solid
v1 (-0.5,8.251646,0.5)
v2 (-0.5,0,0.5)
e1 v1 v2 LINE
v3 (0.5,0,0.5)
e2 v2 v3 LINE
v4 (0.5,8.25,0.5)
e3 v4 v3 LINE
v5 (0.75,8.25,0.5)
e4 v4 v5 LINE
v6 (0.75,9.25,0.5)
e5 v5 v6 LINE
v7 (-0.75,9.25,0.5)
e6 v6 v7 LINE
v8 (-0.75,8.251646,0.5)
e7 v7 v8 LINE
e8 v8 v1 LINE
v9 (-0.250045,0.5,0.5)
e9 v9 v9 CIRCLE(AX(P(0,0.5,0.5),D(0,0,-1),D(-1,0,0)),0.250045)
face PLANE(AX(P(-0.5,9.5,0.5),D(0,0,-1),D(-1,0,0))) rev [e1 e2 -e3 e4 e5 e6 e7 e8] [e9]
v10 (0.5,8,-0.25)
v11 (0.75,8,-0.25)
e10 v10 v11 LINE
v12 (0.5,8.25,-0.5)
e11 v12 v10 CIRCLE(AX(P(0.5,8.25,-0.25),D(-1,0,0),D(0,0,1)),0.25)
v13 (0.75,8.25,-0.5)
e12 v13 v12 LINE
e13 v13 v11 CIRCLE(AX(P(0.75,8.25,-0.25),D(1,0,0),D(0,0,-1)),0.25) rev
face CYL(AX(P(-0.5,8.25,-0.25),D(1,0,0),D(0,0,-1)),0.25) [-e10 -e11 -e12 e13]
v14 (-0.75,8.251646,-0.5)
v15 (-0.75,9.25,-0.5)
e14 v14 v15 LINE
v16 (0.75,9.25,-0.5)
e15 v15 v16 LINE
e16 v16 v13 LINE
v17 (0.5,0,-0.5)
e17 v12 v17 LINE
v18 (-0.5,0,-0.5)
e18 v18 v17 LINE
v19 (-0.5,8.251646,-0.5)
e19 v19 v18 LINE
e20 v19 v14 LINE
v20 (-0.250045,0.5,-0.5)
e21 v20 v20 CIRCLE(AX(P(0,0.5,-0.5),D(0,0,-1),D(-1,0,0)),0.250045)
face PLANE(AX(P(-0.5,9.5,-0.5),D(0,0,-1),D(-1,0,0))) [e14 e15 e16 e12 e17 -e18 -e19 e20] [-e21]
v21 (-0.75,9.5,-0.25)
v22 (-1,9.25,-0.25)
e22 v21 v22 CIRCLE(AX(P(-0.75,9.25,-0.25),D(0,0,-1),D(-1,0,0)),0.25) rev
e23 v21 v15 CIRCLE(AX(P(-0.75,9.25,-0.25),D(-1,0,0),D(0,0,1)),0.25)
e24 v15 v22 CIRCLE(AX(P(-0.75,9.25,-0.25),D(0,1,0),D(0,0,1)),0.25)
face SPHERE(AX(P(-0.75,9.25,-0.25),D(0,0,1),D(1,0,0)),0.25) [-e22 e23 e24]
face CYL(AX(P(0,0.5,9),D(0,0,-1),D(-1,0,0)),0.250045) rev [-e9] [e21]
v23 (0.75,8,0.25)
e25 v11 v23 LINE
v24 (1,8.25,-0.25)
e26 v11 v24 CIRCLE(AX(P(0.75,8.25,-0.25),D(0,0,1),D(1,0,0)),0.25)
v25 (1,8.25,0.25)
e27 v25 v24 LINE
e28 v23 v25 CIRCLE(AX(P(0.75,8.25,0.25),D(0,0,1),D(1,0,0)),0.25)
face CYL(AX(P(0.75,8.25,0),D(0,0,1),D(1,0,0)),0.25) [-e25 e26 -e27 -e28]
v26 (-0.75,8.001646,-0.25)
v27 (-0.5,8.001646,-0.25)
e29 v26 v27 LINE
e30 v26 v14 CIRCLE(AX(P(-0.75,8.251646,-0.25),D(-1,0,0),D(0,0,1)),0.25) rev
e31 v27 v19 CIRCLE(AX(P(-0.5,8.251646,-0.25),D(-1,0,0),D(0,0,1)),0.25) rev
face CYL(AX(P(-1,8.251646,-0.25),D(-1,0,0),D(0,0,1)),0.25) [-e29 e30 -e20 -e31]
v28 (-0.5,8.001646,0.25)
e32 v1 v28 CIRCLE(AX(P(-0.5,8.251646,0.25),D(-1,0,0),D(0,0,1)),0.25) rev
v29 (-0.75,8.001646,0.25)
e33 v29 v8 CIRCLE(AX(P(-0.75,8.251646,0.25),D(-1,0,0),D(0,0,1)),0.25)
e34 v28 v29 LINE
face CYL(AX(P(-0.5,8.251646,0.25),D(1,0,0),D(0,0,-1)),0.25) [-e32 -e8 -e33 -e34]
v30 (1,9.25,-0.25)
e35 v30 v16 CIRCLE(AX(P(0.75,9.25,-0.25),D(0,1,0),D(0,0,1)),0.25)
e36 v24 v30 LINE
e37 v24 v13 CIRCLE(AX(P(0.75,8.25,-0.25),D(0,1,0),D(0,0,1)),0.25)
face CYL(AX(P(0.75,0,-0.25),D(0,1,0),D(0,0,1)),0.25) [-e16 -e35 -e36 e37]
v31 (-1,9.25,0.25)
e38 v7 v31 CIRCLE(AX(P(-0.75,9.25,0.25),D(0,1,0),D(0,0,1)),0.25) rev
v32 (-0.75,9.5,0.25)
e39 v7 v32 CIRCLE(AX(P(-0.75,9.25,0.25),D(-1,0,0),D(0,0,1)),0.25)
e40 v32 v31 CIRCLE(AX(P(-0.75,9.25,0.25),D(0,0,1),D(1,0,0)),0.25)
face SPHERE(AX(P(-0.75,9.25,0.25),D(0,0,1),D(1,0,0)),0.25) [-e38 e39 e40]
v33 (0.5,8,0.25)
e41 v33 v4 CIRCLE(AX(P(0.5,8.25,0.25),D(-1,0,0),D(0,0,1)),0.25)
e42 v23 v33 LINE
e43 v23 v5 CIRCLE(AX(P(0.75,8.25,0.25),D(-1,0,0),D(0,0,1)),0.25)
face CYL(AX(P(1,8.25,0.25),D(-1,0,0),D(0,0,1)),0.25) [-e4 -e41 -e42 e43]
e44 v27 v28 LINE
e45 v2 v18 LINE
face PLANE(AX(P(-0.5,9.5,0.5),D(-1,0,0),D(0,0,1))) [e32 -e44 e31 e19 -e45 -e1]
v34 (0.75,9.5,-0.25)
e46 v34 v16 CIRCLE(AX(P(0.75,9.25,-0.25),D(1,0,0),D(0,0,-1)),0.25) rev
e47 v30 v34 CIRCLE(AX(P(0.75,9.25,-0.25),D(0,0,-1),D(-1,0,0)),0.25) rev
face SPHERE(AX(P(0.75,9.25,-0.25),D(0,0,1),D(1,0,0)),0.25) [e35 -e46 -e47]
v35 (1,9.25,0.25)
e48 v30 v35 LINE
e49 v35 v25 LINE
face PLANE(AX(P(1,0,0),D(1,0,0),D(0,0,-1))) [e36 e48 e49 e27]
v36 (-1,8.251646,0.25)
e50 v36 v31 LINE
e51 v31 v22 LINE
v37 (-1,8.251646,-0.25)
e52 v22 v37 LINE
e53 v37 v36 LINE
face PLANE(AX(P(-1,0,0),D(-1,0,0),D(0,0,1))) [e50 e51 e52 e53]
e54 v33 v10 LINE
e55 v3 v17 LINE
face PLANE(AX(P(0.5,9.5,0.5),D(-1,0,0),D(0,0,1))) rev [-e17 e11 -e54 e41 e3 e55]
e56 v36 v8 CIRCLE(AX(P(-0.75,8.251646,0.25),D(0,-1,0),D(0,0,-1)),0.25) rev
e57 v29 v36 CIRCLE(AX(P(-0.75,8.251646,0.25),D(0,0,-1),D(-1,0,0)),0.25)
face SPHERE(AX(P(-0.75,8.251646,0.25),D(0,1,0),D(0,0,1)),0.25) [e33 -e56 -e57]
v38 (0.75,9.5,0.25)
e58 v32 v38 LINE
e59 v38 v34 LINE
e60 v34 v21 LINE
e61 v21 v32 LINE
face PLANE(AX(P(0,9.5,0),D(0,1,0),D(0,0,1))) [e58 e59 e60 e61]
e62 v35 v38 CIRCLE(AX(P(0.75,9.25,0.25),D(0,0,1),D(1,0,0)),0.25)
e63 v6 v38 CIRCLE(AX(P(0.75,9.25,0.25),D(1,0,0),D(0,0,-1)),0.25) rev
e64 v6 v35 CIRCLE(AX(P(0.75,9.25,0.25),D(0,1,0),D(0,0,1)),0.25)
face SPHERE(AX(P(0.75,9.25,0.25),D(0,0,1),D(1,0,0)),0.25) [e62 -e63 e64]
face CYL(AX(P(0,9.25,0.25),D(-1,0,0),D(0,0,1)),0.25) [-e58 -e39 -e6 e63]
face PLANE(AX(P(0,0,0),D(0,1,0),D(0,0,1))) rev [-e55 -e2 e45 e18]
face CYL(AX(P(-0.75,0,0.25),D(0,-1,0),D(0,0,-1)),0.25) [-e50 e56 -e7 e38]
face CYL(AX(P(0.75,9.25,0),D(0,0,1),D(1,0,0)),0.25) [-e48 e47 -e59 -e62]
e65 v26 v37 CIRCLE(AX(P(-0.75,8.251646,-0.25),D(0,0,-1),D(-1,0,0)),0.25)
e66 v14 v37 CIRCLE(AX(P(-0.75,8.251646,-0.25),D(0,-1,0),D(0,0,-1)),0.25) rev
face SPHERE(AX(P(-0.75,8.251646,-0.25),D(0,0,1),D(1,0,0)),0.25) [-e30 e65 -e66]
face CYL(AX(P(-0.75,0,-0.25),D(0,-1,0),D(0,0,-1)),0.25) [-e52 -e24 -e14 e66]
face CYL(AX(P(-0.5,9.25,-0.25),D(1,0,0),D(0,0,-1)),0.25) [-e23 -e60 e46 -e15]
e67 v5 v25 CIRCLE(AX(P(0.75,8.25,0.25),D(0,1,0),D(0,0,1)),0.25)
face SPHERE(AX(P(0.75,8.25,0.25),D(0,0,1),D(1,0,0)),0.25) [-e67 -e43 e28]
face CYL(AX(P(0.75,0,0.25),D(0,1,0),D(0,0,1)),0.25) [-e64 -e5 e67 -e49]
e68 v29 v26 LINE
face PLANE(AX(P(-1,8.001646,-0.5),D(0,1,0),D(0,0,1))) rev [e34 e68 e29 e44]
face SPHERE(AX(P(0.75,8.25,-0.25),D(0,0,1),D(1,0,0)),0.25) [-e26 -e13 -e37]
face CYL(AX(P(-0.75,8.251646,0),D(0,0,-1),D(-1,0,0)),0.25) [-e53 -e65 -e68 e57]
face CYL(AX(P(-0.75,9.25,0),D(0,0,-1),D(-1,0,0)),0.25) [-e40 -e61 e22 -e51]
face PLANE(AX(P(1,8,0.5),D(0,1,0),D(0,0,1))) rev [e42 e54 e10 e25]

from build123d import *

# Parameters (mm, degrees)
SZKIC1_W                    = 1
SZKIC1_H                    = 1
DODANIE_WYCI_GNI_CIE2_DEPTH = 9.5
SZKIC2_R                    = 0.250044668
WYTNIJ_WYCI_GNI_CIE1_DEPTH  = 9.5
SZKIC3_W                    = 1
SZKIC3_H                    = 1.5
DODANIE_WYCI_GNI_CIE3_DEPTH = 0.5
SZKIC4_W                    = 1
SZKIC4_H                    = 1.498354428
DODANIE_WYCI_GNI_CIE4_DEPTH = 0.5
ZAOKR_GLENIE1_R             = 0.25
ZAOKR_GLENIE2_R             = 0.25


with BuildPart() as part:
    # Szkic1 → Dodanie-wyciągnięcie2 (new body)
    with BuildSketch(Plane(origin=(0, 0, 0), x_dir=(1, 0, 0), z_dir=(0, 1, 0))):
        Rectangle(SZKIC1_W, SZKIC1_H)
    extrude(amount=DODANIE_WYCI_GNI_CIE2_DEPTH)

    # Szkic2 → Wytnij-wyciągnięcie1 (cut)
    with BuildSketch(Plane(origin=(0, 0, -0.5), x_dir=(-1, 0, 0), z_dir=(0, 0, -1))):
        with Locations((0, 0.5)):
            Circle(SZKIC2_R)
    extrude(amount=-WYTNIJ_WYCI_GNI_CIE1_DEPTH, mode=Mode.SUBTRACT)

    # Szkic3 → Dodanie-wyciągnięcie3 (add)
    with BuildSketch(Plane(origin=(0.5, 0, 0), x_dir=(0, 0, -1), z_dir=(1, 0, 0))):
        with Locations((0, 8.75)):
            Rectangle(SZKIC3_W, SZKIC3_H)
    extrude(amount=DODANIE_WYCI_GNI_CIE3_DEPTH)

    # Szkic4 → Dodanie-wyciągnięcie4 (add)
    with BuildSketch(Plane.ZY.offset(0.5)):
        with Locations((0, 8.750822786)):
            Rectangle(SZKIC4_W, SZKIC4_H)
    extrude(amount=DODANIE_WYCI_GNI_CIE4_DEPTH)

    # Zaokrąglenie1
    zaokr_glenie1_edges = [part.edges().sort_by_distance(p)[0] for p in [
        (0, 9.5, -0.5),
        (0.75, 8, 0.5),
        (0.75, 8, -0.5),
        (1, 8.75, 0.5),
        (1, 8.75, -0.5),
        (1, 9.5, 0),
        (-0.75, 8.001645572, -0.5),
        (-1, 8.750822786, -0.5),
        (-1, 8.750822786, 0.5),
        (-1, 9.5, 0),
        (0, 9.5, 0.5),
    ]]
    fillet(zaokr_glenie1_edges, radius=ZAOKR_GLENIE1_R)

    # Zaokrąglenie2
    # the kernel refuses this fillet: 0.25 mm, written as the material it takes off along each edge
    with BuildSketch(Plane(origin=(0.75, 8.25, -0.25), x_dir=(0, -1, 0), z_dir=(1, 0, 0))) as zaokr_glenie2_piece_1_section:
        Polygon((0, 0), (ZAOKR_GLENIE2_R, 0), (ZAOKR_GLENIE2_R, ZAOKR_GLENIE2_R), (0, ZAOKR_GLENIE2_R), align=None)
    zaokr_glenie2_piece_1 = extrude(amount=ZAOKR_GLENIE2_R, mode=Mode.PRIVATE)
    zaokr_glenie2_piece_1 = zaokr_glenie2_piece_1 - Plane(origin=(0.75, 8.25, -0.25), x_dir=(0, 0.7071067811865475, 0.7071067811865475), z_dir=(1, 0, 0)) * Sphere(ZAOKR_GLENIE2_R, mode=Mode.PRIVATE)
    add(zaokr_glenie2_piece_1, mode=Mode.SUBTRACT)
    with BuildSketch(Plane(origin=(-0.75, 8.251645572, -0.25), x_dir=(0, -1, 0), z_dir=(-1, 0, 0))) as zaokr_glenie2_piece_2_section:
        Polygon((0, 0), (ZAOKR_GLENIE2_R, 0), (ZAOKR_GLENIE2_R, -ZAOKR_GLENIE2_R), (0, -ZAOKR_GLENIE2_R), align=None)
    zaokr_glenie2_piece_2 = extrude(amount=ZAOKR_GLENIE2_R, mode=Mode.PRIVATE)
    zaokr_glenie2_piece_2 = zaokr_glenie2_piece_2 - Plane(origin=(-0.75, 8.251645572, -0.25), x_dir=(0, 0.7071067811865475, 0.7071067811865475), z_dir=(-1, 0, 0)) * Sphere(ZAOKR_GLENIE2_R, mode=Mode.PRIVATE)
    add(zaokr_glenie2_piece_2, mode=Mode.SUBTRACT)
    with BuildSketch(Plane(origin=(0.75, 8.25, 0.25), x_dir=(0, -1, 0), z_dir=(1, 0, 0))) as zaokr_glenie2_piece_3_section:
        Polygon((0, 0), (ZAOKR_GLENIE2_R, 0), (ZAOKR_GLENIE2_R, -ZAOKR_GLENIE2_R), (0, -ZAOKR_GLENIE2_R), align=None)
    zaokr_glenie2_piece_3 = extrude(amount=ZAOKR_GLENIE2_R, mode=Mode.PRIVATE)
    zaokr_glenie2_piece_3 = zaokr_glenie2_piece_3 - Plane(origin=(0.75, 8.25, 0.25), x_dir=(0, 0.7071067811865475, -0.7071067811865475), z_dir=(1, 0, 0)) * Sphere(ZAOKR_GLENIE2_R, mode=Mode.PRIVATE)
    add(zaokr_glenie2_piece_3, mode=Mode.SUBTRACT)
    with BuildSketch(Plane(origin=(-1, 8.001645572, 0.25), x_dir=(0, 1, 0), z_dir=(0, 0, -1)), Plane(origin=(1, 8, -0.25), x_dir=(0, 1, 0), z_dir=(0, 0, 1))) as zaokr_glenie2_piece_4:
        with BuildLine():
            CenterArc((ZAOKR_GLENIE2_R, ZAOKR_GLENIE2_R), ZAOKR_GLENIE2_R, 180, 90)
            Line((0, ZAOKR_GLENIE2_R), (0, 0))
            Line((0, 0), (ZAOKR_GLENIE2_R, 0))
        make_face()
    extrude(amount=0.5, mode=Mode.SUBTRACT)
    with BuildSketch(Plane(origin=(-0.5, 8.001645572, 0.5), x_dir=(0, 1, 0), z_dir=(-1, 0, 0))) as zaokr_glenie2_piece_5:
        with BuildLine():
            CenterArc((ZAOKR_GLENIE2_R, ZAOKR_GLENIE2_R), ZAOKR_GLENIE2_R, 180, 90)
            Line((0, ZAOKR_GLENIE2_R), (0, 0))
            Line((0, 0), (ZAOKR_GLENIE2_R, 0))
        make_face()
    extrude(amount=0.25, mode=Mode.SUBTRACT)
    with BuildSketch(Plane(origin=(-0.75, 8.001645572, 0.25), x_dir=(0, 0, 1), z_dir=(1, 0, 0))) as zaokr_glenie2_piece_6:
        with BuildLine():
            CenterArc((0.25 - ZAOKR_GLENIE2_R, -ZAOKR_GLENIE2_R), ZAOKR_GLENIE2_R, 0, 90)
            Line((0.25 - ZAOKR_GLENIE2_R, 0), (0.25, 0))
            Line((0.25, 0), (0.25, -ZAOKR_GLENIE2_R))
        make_face()
    revolve(axis=Axis((-0.75, 8.001645572, 0.25), (0, -1, 0)), revolution_arc=90, mode=Mode.SUBTRACT)


solid = part.part
